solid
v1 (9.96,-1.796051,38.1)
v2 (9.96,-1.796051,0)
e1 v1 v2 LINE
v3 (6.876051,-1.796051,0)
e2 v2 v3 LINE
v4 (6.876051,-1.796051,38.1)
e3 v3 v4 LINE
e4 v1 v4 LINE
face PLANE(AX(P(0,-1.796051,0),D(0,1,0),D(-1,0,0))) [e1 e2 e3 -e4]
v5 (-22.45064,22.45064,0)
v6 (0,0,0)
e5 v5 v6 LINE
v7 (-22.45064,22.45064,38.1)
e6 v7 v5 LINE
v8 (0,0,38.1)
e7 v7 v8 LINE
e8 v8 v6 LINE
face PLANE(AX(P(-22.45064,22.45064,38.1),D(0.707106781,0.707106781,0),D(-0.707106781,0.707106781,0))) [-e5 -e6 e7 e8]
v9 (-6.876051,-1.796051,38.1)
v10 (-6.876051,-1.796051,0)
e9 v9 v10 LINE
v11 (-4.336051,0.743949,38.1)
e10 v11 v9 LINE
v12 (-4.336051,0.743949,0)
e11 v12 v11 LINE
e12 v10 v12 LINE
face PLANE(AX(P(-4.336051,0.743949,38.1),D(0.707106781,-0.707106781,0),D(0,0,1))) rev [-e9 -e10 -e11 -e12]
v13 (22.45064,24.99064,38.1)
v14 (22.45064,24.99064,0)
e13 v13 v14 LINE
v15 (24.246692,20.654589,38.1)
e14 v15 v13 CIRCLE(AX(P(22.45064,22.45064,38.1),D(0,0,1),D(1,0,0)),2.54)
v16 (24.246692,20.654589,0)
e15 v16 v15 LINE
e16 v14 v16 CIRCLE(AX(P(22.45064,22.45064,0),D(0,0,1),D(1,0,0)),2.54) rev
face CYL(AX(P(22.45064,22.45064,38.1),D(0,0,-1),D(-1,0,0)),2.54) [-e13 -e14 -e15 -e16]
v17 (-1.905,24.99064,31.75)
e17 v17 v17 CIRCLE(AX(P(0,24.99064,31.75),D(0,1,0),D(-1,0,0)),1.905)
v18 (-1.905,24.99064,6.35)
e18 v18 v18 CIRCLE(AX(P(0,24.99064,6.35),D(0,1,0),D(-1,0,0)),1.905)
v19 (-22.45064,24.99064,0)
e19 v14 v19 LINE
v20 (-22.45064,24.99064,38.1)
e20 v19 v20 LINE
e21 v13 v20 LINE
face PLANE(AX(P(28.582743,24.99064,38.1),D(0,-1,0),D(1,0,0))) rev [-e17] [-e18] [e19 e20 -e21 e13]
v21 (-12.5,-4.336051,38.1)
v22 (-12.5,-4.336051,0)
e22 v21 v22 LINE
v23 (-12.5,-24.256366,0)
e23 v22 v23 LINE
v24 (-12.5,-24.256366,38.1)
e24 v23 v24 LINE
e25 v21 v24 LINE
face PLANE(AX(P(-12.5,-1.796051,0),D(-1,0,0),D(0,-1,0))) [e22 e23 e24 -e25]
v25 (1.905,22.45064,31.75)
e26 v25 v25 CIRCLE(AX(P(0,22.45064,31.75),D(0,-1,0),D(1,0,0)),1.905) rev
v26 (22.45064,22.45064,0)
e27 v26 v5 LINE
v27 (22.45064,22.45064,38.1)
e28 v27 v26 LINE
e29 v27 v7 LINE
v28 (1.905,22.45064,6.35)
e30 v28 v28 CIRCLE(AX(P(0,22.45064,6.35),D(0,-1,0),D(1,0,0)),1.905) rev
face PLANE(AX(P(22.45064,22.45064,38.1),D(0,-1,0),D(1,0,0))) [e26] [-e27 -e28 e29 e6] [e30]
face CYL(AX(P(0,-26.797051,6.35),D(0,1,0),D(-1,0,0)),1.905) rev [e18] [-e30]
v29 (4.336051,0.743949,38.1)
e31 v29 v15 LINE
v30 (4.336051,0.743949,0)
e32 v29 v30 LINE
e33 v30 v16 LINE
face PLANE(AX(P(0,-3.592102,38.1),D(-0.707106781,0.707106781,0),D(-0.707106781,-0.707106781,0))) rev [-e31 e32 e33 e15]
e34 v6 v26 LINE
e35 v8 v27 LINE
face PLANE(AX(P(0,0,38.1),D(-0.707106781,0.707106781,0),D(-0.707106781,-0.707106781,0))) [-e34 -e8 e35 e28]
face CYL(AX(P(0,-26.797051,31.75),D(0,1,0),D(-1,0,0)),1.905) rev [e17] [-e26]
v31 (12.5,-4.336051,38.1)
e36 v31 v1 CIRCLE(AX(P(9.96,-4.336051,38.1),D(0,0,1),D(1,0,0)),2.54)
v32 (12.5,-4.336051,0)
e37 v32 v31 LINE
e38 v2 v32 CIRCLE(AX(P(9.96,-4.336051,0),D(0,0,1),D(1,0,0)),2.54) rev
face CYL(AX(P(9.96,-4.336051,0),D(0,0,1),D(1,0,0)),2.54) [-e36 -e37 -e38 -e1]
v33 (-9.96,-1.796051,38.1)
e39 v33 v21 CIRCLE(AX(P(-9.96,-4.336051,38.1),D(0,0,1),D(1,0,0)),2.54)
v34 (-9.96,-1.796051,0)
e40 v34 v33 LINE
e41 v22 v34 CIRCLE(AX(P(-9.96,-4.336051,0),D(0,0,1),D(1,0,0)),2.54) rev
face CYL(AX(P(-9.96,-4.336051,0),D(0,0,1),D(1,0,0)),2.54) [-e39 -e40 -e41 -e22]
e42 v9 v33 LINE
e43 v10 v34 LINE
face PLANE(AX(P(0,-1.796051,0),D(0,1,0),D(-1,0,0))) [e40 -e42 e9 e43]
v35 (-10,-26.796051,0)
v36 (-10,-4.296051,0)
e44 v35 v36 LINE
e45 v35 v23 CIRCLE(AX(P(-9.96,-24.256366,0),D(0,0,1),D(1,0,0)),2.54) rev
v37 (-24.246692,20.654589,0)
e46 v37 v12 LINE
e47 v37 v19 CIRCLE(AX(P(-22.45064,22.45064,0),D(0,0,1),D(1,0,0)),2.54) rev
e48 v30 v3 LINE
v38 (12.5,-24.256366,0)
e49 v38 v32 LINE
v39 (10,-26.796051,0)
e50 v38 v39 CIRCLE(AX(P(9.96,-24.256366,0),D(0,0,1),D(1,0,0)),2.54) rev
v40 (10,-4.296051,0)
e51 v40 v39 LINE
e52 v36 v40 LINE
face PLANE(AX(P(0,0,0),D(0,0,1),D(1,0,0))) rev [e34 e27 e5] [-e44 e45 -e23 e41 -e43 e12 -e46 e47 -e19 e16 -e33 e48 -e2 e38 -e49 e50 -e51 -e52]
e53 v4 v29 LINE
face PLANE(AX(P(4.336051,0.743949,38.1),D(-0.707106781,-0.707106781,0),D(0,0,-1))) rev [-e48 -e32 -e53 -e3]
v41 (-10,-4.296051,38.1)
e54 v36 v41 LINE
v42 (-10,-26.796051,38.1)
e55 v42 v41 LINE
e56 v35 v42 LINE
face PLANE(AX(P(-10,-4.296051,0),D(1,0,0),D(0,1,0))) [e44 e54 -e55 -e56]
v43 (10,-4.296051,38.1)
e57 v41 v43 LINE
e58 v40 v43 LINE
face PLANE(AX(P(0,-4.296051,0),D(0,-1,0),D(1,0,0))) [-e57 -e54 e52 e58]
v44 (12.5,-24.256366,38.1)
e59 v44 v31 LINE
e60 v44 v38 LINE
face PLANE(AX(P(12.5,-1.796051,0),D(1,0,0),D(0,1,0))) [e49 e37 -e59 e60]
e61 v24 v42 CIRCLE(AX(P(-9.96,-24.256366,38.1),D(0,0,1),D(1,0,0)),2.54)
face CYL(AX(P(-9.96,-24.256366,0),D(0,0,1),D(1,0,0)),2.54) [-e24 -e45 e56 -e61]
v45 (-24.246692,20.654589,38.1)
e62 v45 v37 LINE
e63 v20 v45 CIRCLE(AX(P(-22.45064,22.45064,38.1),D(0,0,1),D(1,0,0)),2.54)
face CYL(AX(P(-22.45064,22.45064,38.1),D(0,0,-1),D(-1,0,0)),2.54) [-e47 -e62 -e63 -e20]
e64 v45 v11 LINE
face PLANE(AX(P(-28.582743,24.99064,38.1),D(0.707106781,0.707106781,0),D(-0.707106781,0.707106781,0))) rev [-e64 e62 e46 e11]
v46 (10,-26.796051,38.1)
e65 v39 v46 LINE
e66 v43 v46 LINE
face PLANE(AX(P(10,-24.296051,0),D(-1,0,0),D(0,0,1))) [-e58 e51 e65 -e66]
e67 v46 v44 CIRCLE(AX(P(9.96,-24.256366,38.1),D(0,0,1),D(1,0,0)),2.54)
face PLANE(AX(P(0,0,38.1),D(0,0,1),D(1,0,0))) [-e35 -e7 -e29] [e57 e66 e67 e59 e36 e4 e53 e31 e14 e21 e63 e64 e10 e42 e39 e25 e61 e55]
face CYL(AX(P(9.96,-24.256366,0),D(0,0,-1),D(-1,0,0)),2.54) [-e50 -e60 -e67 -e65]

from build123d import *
from OCP.BRepFilletAPI import BRepFilletAPI_MakeChamfer

# Parameters (mm, degrees)
BOSS_EXTRUDE1_DEPTH = 38.1
CHAMFER1_SIZE       = 2.54
BOSS_EXTRUDE2_DEPTH = 38.1
CHAMFER2_SIZE       = 5.08
CHAMFER2_SIZE2      = 3.592102448
FILLET1_R           = 2.54
CUT_EXTRUDE1_REACH  = 70.978
SKETCH3_R           = 1.905


with BuildPart() as part:
    # Sketch1 → Boss-Extrude1 (new body)
    with BuildSketch(Plane.XY):
        Polygon((0, -3.592102448), (28.582742751, 24.990640303), (-28.582742751, 24.990640303), align=None)
        Polygon((0, 0), (22.450640303, 22.450640303), (-22.450640303, 22.450640303), align=None, mode=Mode.SUBTRACT)
    extrude(amount=BOSS_EXTRUDE1_DEPTH)

    # Chamfer1
    chamfer1_edges = [part.edges().sort_by_distance(p)[0] for p in [
        (0, -3.592102448, 19.05),
    ]]
    chamfer(chamfer1_edges, length=CHAMFER1_SIZE)

    # Sketch2 → Boss-Extrude2 (add)
    with BuildSketch(Plane.XY.offset(38.1)):
        Polygon((0, -1.796051224), (12.5, -1.796051224), (12.5, -26.796051224), (10, -26.796051224), (10, -24.296051224), (10, -4.296051224), (0, -4.296051224), (-10, -4.296051224), (-10, -24.296051224), (-10, -26.796051224), (-12.5, -26.796051224), (-12.5, -1.796051224), align=None)
    extrude(amount=-BOSS_EXTRUDE2_DEPTH)

    # Chamfer2: one chamfer whose edges measure the first distance from different faces: ONE call of the kernel's chamfer builder (chamfer() names one face for all edges)
    chamfer2_edges_1 = [part.edges().sort_by_distance(p)[0] for p in [
        (-1.796051224, -1.796051224, 19.05),
    ]]
    chamfer2_side_1 = [part.faces().sort_by_distance(p)[0] for p in [
        (-7.148025612, -1.796051224, 19.05),
    ]]
    chamfer2_edges_2 = [part.edges().sort_by_distance(p)[0] for p in [
        (1.796051224, -1.796051224, 19.05),
    ]]
    chamfer2_side_2 = [part.faces().sort_by_distance(p)[0] for p in [
        (7.148025612, -1.796051224, 19.05),
    ]]
    chamfer2 = BRepFilletAPI_MakeChamfer(part.part.solid().wrapped)
    for e in chamfer2_edges_1:
        chamfer2.Add(CHAMFER2_SIZE, CHAMFER2_SIZE2, e.wrapped, chamfer2_side_1[0].wrapped)  # the first distance lies on this face
    for e in chamfer2_edges_2:
        chamfer2.Add(CHAMFER2_SIZE, CHAMFER2_SIZE2, e.wrapped, chamfer2_side_2[0].wrapped)  # the first distance lies on this face
    add(Compound.cast(chamfer2.Shape()), mode=Mode.REPLACE)

    # Fillet1
    # the kernel refuses this fillet: 2.54 mm, written as the material it takes off along each edge
    with BuildSketch(Plane(origin=(-12.5, -26.796051224, 44.45), x_dir=(1, 0, 0), z_dir=(0, 0, -1)), Plane(origin=(12.5, -1.796051224, 44.45), x_dir=(-1, 0, 0), z_dir=(0, 0, -1)), Plane(origin=(12.5, -26.796051224, 44.45), x_dir=(0, 1, 0), z_dir=(0, 0, -1))) as fillet1_piece_1:
        with BuildLine():
            CenterArc((FILLET1_R, -FILLET1_R), FILLET1_R, 90, 90)
            Line((0, -FILLET1_R), (0, 0))
            Line((0, 0), (FILLET1_R, 0))
        make_face()
    extrude(amount=50.8, mode=Mode.SUBTRACT)
    with BuildSketch(Plane(origin=(-12.5, -1.796051224, 44.45), x_dir=(1, 0, 0), z_dir=(0, 0, -1))) as fillet1_piece_2:
        with BuildLine():
            CenterArc((FILLET1_R, FILLET1_R), FILLET1_R, 180, 90)
            Line((0, FILLET1_R), (0, 0))
            Line((0, 0), (FILLET1_R, 0))
        make_face()
    extrude(amount=50.8, mode=Mode.SUBTRACT)
    with BuildSketch(Plane(origin=(-28.582742751, 24.990640303, -15.330256121), x_dir=(1, 0, 0), z_dir=(0, 0, 1)), Plane(origin=(28.582742751, 24.990640303, -15.330256121), x_dir=(-0.7071067811865476, -0.7071067811865476, 0), z_dir=(0, 0, 1))) as fillet1_piece_3:
        with BuildLine():
            CenterArc((FILLET1_R * 2.41421356237, -FILLET1_R), FILLET1_R, 90, 135)
            Line((FILLET1_R * 1.70710678119, -FILLET1_R * 1.70710678119), (0, 0))
            Line((0, 0), (FILLET1_R * 2.41421356237, 0))
        make_face()
    extrude(amount=68.760512242, mode=Mode.SUBTRACT)

    # Sketch3 → Cut-Extrude1 (cut, up to next)
    with BuildSketch(Plane(origin=(0, 24.990640303, 0), x_dir=(1, 0, 0), z_dir=(0, 1, 0)), mode=Mode.PRIVATE) as cut_extrude1_sk1:
        with Locations(Location((0, -31.75, 0), (0, 0, 180))):
            Circle(SKETCH3_R)
    cut_extrude1_tool1 = extrude(cut_extrude1_sk1.sketch, amount=-CUT_EXTRUDE1_REACH, mode=Mode.PRIVATE) & part.part
    # Sketch3 → Cut-Extrude1 (cut, up to next)
    with BuildSketch(Plane(origin=(0, 24.990640303, 0), x_dir=(1, 0, 0), z_dir=(0, 1, 0)), mode=Mode.PRIVATE) as cut_extrude1_sk2:
        with Locations(Location((0, -6.35, 0), (0, 0, 180))):
            Circle(SKETCH3_R)
    cut_extrude1_tool2 = extrude(cut_extrude1_sk2.sketch, amount=-CUT_EXTRUDE1_REACH, mode=Mode.PRIVATE) & part.part
    add(cut_extrude1_tool1.solids().sort_by_distance((0, 24.99064, 31.75))[0], mode=Mode.SUBTRACT)
    add(cut_extrude1_tool2.solids().sort_by_distance((0, 24.99064, 6.35))[0], mode=Mode.SUBTRACT)


solid = part.part
